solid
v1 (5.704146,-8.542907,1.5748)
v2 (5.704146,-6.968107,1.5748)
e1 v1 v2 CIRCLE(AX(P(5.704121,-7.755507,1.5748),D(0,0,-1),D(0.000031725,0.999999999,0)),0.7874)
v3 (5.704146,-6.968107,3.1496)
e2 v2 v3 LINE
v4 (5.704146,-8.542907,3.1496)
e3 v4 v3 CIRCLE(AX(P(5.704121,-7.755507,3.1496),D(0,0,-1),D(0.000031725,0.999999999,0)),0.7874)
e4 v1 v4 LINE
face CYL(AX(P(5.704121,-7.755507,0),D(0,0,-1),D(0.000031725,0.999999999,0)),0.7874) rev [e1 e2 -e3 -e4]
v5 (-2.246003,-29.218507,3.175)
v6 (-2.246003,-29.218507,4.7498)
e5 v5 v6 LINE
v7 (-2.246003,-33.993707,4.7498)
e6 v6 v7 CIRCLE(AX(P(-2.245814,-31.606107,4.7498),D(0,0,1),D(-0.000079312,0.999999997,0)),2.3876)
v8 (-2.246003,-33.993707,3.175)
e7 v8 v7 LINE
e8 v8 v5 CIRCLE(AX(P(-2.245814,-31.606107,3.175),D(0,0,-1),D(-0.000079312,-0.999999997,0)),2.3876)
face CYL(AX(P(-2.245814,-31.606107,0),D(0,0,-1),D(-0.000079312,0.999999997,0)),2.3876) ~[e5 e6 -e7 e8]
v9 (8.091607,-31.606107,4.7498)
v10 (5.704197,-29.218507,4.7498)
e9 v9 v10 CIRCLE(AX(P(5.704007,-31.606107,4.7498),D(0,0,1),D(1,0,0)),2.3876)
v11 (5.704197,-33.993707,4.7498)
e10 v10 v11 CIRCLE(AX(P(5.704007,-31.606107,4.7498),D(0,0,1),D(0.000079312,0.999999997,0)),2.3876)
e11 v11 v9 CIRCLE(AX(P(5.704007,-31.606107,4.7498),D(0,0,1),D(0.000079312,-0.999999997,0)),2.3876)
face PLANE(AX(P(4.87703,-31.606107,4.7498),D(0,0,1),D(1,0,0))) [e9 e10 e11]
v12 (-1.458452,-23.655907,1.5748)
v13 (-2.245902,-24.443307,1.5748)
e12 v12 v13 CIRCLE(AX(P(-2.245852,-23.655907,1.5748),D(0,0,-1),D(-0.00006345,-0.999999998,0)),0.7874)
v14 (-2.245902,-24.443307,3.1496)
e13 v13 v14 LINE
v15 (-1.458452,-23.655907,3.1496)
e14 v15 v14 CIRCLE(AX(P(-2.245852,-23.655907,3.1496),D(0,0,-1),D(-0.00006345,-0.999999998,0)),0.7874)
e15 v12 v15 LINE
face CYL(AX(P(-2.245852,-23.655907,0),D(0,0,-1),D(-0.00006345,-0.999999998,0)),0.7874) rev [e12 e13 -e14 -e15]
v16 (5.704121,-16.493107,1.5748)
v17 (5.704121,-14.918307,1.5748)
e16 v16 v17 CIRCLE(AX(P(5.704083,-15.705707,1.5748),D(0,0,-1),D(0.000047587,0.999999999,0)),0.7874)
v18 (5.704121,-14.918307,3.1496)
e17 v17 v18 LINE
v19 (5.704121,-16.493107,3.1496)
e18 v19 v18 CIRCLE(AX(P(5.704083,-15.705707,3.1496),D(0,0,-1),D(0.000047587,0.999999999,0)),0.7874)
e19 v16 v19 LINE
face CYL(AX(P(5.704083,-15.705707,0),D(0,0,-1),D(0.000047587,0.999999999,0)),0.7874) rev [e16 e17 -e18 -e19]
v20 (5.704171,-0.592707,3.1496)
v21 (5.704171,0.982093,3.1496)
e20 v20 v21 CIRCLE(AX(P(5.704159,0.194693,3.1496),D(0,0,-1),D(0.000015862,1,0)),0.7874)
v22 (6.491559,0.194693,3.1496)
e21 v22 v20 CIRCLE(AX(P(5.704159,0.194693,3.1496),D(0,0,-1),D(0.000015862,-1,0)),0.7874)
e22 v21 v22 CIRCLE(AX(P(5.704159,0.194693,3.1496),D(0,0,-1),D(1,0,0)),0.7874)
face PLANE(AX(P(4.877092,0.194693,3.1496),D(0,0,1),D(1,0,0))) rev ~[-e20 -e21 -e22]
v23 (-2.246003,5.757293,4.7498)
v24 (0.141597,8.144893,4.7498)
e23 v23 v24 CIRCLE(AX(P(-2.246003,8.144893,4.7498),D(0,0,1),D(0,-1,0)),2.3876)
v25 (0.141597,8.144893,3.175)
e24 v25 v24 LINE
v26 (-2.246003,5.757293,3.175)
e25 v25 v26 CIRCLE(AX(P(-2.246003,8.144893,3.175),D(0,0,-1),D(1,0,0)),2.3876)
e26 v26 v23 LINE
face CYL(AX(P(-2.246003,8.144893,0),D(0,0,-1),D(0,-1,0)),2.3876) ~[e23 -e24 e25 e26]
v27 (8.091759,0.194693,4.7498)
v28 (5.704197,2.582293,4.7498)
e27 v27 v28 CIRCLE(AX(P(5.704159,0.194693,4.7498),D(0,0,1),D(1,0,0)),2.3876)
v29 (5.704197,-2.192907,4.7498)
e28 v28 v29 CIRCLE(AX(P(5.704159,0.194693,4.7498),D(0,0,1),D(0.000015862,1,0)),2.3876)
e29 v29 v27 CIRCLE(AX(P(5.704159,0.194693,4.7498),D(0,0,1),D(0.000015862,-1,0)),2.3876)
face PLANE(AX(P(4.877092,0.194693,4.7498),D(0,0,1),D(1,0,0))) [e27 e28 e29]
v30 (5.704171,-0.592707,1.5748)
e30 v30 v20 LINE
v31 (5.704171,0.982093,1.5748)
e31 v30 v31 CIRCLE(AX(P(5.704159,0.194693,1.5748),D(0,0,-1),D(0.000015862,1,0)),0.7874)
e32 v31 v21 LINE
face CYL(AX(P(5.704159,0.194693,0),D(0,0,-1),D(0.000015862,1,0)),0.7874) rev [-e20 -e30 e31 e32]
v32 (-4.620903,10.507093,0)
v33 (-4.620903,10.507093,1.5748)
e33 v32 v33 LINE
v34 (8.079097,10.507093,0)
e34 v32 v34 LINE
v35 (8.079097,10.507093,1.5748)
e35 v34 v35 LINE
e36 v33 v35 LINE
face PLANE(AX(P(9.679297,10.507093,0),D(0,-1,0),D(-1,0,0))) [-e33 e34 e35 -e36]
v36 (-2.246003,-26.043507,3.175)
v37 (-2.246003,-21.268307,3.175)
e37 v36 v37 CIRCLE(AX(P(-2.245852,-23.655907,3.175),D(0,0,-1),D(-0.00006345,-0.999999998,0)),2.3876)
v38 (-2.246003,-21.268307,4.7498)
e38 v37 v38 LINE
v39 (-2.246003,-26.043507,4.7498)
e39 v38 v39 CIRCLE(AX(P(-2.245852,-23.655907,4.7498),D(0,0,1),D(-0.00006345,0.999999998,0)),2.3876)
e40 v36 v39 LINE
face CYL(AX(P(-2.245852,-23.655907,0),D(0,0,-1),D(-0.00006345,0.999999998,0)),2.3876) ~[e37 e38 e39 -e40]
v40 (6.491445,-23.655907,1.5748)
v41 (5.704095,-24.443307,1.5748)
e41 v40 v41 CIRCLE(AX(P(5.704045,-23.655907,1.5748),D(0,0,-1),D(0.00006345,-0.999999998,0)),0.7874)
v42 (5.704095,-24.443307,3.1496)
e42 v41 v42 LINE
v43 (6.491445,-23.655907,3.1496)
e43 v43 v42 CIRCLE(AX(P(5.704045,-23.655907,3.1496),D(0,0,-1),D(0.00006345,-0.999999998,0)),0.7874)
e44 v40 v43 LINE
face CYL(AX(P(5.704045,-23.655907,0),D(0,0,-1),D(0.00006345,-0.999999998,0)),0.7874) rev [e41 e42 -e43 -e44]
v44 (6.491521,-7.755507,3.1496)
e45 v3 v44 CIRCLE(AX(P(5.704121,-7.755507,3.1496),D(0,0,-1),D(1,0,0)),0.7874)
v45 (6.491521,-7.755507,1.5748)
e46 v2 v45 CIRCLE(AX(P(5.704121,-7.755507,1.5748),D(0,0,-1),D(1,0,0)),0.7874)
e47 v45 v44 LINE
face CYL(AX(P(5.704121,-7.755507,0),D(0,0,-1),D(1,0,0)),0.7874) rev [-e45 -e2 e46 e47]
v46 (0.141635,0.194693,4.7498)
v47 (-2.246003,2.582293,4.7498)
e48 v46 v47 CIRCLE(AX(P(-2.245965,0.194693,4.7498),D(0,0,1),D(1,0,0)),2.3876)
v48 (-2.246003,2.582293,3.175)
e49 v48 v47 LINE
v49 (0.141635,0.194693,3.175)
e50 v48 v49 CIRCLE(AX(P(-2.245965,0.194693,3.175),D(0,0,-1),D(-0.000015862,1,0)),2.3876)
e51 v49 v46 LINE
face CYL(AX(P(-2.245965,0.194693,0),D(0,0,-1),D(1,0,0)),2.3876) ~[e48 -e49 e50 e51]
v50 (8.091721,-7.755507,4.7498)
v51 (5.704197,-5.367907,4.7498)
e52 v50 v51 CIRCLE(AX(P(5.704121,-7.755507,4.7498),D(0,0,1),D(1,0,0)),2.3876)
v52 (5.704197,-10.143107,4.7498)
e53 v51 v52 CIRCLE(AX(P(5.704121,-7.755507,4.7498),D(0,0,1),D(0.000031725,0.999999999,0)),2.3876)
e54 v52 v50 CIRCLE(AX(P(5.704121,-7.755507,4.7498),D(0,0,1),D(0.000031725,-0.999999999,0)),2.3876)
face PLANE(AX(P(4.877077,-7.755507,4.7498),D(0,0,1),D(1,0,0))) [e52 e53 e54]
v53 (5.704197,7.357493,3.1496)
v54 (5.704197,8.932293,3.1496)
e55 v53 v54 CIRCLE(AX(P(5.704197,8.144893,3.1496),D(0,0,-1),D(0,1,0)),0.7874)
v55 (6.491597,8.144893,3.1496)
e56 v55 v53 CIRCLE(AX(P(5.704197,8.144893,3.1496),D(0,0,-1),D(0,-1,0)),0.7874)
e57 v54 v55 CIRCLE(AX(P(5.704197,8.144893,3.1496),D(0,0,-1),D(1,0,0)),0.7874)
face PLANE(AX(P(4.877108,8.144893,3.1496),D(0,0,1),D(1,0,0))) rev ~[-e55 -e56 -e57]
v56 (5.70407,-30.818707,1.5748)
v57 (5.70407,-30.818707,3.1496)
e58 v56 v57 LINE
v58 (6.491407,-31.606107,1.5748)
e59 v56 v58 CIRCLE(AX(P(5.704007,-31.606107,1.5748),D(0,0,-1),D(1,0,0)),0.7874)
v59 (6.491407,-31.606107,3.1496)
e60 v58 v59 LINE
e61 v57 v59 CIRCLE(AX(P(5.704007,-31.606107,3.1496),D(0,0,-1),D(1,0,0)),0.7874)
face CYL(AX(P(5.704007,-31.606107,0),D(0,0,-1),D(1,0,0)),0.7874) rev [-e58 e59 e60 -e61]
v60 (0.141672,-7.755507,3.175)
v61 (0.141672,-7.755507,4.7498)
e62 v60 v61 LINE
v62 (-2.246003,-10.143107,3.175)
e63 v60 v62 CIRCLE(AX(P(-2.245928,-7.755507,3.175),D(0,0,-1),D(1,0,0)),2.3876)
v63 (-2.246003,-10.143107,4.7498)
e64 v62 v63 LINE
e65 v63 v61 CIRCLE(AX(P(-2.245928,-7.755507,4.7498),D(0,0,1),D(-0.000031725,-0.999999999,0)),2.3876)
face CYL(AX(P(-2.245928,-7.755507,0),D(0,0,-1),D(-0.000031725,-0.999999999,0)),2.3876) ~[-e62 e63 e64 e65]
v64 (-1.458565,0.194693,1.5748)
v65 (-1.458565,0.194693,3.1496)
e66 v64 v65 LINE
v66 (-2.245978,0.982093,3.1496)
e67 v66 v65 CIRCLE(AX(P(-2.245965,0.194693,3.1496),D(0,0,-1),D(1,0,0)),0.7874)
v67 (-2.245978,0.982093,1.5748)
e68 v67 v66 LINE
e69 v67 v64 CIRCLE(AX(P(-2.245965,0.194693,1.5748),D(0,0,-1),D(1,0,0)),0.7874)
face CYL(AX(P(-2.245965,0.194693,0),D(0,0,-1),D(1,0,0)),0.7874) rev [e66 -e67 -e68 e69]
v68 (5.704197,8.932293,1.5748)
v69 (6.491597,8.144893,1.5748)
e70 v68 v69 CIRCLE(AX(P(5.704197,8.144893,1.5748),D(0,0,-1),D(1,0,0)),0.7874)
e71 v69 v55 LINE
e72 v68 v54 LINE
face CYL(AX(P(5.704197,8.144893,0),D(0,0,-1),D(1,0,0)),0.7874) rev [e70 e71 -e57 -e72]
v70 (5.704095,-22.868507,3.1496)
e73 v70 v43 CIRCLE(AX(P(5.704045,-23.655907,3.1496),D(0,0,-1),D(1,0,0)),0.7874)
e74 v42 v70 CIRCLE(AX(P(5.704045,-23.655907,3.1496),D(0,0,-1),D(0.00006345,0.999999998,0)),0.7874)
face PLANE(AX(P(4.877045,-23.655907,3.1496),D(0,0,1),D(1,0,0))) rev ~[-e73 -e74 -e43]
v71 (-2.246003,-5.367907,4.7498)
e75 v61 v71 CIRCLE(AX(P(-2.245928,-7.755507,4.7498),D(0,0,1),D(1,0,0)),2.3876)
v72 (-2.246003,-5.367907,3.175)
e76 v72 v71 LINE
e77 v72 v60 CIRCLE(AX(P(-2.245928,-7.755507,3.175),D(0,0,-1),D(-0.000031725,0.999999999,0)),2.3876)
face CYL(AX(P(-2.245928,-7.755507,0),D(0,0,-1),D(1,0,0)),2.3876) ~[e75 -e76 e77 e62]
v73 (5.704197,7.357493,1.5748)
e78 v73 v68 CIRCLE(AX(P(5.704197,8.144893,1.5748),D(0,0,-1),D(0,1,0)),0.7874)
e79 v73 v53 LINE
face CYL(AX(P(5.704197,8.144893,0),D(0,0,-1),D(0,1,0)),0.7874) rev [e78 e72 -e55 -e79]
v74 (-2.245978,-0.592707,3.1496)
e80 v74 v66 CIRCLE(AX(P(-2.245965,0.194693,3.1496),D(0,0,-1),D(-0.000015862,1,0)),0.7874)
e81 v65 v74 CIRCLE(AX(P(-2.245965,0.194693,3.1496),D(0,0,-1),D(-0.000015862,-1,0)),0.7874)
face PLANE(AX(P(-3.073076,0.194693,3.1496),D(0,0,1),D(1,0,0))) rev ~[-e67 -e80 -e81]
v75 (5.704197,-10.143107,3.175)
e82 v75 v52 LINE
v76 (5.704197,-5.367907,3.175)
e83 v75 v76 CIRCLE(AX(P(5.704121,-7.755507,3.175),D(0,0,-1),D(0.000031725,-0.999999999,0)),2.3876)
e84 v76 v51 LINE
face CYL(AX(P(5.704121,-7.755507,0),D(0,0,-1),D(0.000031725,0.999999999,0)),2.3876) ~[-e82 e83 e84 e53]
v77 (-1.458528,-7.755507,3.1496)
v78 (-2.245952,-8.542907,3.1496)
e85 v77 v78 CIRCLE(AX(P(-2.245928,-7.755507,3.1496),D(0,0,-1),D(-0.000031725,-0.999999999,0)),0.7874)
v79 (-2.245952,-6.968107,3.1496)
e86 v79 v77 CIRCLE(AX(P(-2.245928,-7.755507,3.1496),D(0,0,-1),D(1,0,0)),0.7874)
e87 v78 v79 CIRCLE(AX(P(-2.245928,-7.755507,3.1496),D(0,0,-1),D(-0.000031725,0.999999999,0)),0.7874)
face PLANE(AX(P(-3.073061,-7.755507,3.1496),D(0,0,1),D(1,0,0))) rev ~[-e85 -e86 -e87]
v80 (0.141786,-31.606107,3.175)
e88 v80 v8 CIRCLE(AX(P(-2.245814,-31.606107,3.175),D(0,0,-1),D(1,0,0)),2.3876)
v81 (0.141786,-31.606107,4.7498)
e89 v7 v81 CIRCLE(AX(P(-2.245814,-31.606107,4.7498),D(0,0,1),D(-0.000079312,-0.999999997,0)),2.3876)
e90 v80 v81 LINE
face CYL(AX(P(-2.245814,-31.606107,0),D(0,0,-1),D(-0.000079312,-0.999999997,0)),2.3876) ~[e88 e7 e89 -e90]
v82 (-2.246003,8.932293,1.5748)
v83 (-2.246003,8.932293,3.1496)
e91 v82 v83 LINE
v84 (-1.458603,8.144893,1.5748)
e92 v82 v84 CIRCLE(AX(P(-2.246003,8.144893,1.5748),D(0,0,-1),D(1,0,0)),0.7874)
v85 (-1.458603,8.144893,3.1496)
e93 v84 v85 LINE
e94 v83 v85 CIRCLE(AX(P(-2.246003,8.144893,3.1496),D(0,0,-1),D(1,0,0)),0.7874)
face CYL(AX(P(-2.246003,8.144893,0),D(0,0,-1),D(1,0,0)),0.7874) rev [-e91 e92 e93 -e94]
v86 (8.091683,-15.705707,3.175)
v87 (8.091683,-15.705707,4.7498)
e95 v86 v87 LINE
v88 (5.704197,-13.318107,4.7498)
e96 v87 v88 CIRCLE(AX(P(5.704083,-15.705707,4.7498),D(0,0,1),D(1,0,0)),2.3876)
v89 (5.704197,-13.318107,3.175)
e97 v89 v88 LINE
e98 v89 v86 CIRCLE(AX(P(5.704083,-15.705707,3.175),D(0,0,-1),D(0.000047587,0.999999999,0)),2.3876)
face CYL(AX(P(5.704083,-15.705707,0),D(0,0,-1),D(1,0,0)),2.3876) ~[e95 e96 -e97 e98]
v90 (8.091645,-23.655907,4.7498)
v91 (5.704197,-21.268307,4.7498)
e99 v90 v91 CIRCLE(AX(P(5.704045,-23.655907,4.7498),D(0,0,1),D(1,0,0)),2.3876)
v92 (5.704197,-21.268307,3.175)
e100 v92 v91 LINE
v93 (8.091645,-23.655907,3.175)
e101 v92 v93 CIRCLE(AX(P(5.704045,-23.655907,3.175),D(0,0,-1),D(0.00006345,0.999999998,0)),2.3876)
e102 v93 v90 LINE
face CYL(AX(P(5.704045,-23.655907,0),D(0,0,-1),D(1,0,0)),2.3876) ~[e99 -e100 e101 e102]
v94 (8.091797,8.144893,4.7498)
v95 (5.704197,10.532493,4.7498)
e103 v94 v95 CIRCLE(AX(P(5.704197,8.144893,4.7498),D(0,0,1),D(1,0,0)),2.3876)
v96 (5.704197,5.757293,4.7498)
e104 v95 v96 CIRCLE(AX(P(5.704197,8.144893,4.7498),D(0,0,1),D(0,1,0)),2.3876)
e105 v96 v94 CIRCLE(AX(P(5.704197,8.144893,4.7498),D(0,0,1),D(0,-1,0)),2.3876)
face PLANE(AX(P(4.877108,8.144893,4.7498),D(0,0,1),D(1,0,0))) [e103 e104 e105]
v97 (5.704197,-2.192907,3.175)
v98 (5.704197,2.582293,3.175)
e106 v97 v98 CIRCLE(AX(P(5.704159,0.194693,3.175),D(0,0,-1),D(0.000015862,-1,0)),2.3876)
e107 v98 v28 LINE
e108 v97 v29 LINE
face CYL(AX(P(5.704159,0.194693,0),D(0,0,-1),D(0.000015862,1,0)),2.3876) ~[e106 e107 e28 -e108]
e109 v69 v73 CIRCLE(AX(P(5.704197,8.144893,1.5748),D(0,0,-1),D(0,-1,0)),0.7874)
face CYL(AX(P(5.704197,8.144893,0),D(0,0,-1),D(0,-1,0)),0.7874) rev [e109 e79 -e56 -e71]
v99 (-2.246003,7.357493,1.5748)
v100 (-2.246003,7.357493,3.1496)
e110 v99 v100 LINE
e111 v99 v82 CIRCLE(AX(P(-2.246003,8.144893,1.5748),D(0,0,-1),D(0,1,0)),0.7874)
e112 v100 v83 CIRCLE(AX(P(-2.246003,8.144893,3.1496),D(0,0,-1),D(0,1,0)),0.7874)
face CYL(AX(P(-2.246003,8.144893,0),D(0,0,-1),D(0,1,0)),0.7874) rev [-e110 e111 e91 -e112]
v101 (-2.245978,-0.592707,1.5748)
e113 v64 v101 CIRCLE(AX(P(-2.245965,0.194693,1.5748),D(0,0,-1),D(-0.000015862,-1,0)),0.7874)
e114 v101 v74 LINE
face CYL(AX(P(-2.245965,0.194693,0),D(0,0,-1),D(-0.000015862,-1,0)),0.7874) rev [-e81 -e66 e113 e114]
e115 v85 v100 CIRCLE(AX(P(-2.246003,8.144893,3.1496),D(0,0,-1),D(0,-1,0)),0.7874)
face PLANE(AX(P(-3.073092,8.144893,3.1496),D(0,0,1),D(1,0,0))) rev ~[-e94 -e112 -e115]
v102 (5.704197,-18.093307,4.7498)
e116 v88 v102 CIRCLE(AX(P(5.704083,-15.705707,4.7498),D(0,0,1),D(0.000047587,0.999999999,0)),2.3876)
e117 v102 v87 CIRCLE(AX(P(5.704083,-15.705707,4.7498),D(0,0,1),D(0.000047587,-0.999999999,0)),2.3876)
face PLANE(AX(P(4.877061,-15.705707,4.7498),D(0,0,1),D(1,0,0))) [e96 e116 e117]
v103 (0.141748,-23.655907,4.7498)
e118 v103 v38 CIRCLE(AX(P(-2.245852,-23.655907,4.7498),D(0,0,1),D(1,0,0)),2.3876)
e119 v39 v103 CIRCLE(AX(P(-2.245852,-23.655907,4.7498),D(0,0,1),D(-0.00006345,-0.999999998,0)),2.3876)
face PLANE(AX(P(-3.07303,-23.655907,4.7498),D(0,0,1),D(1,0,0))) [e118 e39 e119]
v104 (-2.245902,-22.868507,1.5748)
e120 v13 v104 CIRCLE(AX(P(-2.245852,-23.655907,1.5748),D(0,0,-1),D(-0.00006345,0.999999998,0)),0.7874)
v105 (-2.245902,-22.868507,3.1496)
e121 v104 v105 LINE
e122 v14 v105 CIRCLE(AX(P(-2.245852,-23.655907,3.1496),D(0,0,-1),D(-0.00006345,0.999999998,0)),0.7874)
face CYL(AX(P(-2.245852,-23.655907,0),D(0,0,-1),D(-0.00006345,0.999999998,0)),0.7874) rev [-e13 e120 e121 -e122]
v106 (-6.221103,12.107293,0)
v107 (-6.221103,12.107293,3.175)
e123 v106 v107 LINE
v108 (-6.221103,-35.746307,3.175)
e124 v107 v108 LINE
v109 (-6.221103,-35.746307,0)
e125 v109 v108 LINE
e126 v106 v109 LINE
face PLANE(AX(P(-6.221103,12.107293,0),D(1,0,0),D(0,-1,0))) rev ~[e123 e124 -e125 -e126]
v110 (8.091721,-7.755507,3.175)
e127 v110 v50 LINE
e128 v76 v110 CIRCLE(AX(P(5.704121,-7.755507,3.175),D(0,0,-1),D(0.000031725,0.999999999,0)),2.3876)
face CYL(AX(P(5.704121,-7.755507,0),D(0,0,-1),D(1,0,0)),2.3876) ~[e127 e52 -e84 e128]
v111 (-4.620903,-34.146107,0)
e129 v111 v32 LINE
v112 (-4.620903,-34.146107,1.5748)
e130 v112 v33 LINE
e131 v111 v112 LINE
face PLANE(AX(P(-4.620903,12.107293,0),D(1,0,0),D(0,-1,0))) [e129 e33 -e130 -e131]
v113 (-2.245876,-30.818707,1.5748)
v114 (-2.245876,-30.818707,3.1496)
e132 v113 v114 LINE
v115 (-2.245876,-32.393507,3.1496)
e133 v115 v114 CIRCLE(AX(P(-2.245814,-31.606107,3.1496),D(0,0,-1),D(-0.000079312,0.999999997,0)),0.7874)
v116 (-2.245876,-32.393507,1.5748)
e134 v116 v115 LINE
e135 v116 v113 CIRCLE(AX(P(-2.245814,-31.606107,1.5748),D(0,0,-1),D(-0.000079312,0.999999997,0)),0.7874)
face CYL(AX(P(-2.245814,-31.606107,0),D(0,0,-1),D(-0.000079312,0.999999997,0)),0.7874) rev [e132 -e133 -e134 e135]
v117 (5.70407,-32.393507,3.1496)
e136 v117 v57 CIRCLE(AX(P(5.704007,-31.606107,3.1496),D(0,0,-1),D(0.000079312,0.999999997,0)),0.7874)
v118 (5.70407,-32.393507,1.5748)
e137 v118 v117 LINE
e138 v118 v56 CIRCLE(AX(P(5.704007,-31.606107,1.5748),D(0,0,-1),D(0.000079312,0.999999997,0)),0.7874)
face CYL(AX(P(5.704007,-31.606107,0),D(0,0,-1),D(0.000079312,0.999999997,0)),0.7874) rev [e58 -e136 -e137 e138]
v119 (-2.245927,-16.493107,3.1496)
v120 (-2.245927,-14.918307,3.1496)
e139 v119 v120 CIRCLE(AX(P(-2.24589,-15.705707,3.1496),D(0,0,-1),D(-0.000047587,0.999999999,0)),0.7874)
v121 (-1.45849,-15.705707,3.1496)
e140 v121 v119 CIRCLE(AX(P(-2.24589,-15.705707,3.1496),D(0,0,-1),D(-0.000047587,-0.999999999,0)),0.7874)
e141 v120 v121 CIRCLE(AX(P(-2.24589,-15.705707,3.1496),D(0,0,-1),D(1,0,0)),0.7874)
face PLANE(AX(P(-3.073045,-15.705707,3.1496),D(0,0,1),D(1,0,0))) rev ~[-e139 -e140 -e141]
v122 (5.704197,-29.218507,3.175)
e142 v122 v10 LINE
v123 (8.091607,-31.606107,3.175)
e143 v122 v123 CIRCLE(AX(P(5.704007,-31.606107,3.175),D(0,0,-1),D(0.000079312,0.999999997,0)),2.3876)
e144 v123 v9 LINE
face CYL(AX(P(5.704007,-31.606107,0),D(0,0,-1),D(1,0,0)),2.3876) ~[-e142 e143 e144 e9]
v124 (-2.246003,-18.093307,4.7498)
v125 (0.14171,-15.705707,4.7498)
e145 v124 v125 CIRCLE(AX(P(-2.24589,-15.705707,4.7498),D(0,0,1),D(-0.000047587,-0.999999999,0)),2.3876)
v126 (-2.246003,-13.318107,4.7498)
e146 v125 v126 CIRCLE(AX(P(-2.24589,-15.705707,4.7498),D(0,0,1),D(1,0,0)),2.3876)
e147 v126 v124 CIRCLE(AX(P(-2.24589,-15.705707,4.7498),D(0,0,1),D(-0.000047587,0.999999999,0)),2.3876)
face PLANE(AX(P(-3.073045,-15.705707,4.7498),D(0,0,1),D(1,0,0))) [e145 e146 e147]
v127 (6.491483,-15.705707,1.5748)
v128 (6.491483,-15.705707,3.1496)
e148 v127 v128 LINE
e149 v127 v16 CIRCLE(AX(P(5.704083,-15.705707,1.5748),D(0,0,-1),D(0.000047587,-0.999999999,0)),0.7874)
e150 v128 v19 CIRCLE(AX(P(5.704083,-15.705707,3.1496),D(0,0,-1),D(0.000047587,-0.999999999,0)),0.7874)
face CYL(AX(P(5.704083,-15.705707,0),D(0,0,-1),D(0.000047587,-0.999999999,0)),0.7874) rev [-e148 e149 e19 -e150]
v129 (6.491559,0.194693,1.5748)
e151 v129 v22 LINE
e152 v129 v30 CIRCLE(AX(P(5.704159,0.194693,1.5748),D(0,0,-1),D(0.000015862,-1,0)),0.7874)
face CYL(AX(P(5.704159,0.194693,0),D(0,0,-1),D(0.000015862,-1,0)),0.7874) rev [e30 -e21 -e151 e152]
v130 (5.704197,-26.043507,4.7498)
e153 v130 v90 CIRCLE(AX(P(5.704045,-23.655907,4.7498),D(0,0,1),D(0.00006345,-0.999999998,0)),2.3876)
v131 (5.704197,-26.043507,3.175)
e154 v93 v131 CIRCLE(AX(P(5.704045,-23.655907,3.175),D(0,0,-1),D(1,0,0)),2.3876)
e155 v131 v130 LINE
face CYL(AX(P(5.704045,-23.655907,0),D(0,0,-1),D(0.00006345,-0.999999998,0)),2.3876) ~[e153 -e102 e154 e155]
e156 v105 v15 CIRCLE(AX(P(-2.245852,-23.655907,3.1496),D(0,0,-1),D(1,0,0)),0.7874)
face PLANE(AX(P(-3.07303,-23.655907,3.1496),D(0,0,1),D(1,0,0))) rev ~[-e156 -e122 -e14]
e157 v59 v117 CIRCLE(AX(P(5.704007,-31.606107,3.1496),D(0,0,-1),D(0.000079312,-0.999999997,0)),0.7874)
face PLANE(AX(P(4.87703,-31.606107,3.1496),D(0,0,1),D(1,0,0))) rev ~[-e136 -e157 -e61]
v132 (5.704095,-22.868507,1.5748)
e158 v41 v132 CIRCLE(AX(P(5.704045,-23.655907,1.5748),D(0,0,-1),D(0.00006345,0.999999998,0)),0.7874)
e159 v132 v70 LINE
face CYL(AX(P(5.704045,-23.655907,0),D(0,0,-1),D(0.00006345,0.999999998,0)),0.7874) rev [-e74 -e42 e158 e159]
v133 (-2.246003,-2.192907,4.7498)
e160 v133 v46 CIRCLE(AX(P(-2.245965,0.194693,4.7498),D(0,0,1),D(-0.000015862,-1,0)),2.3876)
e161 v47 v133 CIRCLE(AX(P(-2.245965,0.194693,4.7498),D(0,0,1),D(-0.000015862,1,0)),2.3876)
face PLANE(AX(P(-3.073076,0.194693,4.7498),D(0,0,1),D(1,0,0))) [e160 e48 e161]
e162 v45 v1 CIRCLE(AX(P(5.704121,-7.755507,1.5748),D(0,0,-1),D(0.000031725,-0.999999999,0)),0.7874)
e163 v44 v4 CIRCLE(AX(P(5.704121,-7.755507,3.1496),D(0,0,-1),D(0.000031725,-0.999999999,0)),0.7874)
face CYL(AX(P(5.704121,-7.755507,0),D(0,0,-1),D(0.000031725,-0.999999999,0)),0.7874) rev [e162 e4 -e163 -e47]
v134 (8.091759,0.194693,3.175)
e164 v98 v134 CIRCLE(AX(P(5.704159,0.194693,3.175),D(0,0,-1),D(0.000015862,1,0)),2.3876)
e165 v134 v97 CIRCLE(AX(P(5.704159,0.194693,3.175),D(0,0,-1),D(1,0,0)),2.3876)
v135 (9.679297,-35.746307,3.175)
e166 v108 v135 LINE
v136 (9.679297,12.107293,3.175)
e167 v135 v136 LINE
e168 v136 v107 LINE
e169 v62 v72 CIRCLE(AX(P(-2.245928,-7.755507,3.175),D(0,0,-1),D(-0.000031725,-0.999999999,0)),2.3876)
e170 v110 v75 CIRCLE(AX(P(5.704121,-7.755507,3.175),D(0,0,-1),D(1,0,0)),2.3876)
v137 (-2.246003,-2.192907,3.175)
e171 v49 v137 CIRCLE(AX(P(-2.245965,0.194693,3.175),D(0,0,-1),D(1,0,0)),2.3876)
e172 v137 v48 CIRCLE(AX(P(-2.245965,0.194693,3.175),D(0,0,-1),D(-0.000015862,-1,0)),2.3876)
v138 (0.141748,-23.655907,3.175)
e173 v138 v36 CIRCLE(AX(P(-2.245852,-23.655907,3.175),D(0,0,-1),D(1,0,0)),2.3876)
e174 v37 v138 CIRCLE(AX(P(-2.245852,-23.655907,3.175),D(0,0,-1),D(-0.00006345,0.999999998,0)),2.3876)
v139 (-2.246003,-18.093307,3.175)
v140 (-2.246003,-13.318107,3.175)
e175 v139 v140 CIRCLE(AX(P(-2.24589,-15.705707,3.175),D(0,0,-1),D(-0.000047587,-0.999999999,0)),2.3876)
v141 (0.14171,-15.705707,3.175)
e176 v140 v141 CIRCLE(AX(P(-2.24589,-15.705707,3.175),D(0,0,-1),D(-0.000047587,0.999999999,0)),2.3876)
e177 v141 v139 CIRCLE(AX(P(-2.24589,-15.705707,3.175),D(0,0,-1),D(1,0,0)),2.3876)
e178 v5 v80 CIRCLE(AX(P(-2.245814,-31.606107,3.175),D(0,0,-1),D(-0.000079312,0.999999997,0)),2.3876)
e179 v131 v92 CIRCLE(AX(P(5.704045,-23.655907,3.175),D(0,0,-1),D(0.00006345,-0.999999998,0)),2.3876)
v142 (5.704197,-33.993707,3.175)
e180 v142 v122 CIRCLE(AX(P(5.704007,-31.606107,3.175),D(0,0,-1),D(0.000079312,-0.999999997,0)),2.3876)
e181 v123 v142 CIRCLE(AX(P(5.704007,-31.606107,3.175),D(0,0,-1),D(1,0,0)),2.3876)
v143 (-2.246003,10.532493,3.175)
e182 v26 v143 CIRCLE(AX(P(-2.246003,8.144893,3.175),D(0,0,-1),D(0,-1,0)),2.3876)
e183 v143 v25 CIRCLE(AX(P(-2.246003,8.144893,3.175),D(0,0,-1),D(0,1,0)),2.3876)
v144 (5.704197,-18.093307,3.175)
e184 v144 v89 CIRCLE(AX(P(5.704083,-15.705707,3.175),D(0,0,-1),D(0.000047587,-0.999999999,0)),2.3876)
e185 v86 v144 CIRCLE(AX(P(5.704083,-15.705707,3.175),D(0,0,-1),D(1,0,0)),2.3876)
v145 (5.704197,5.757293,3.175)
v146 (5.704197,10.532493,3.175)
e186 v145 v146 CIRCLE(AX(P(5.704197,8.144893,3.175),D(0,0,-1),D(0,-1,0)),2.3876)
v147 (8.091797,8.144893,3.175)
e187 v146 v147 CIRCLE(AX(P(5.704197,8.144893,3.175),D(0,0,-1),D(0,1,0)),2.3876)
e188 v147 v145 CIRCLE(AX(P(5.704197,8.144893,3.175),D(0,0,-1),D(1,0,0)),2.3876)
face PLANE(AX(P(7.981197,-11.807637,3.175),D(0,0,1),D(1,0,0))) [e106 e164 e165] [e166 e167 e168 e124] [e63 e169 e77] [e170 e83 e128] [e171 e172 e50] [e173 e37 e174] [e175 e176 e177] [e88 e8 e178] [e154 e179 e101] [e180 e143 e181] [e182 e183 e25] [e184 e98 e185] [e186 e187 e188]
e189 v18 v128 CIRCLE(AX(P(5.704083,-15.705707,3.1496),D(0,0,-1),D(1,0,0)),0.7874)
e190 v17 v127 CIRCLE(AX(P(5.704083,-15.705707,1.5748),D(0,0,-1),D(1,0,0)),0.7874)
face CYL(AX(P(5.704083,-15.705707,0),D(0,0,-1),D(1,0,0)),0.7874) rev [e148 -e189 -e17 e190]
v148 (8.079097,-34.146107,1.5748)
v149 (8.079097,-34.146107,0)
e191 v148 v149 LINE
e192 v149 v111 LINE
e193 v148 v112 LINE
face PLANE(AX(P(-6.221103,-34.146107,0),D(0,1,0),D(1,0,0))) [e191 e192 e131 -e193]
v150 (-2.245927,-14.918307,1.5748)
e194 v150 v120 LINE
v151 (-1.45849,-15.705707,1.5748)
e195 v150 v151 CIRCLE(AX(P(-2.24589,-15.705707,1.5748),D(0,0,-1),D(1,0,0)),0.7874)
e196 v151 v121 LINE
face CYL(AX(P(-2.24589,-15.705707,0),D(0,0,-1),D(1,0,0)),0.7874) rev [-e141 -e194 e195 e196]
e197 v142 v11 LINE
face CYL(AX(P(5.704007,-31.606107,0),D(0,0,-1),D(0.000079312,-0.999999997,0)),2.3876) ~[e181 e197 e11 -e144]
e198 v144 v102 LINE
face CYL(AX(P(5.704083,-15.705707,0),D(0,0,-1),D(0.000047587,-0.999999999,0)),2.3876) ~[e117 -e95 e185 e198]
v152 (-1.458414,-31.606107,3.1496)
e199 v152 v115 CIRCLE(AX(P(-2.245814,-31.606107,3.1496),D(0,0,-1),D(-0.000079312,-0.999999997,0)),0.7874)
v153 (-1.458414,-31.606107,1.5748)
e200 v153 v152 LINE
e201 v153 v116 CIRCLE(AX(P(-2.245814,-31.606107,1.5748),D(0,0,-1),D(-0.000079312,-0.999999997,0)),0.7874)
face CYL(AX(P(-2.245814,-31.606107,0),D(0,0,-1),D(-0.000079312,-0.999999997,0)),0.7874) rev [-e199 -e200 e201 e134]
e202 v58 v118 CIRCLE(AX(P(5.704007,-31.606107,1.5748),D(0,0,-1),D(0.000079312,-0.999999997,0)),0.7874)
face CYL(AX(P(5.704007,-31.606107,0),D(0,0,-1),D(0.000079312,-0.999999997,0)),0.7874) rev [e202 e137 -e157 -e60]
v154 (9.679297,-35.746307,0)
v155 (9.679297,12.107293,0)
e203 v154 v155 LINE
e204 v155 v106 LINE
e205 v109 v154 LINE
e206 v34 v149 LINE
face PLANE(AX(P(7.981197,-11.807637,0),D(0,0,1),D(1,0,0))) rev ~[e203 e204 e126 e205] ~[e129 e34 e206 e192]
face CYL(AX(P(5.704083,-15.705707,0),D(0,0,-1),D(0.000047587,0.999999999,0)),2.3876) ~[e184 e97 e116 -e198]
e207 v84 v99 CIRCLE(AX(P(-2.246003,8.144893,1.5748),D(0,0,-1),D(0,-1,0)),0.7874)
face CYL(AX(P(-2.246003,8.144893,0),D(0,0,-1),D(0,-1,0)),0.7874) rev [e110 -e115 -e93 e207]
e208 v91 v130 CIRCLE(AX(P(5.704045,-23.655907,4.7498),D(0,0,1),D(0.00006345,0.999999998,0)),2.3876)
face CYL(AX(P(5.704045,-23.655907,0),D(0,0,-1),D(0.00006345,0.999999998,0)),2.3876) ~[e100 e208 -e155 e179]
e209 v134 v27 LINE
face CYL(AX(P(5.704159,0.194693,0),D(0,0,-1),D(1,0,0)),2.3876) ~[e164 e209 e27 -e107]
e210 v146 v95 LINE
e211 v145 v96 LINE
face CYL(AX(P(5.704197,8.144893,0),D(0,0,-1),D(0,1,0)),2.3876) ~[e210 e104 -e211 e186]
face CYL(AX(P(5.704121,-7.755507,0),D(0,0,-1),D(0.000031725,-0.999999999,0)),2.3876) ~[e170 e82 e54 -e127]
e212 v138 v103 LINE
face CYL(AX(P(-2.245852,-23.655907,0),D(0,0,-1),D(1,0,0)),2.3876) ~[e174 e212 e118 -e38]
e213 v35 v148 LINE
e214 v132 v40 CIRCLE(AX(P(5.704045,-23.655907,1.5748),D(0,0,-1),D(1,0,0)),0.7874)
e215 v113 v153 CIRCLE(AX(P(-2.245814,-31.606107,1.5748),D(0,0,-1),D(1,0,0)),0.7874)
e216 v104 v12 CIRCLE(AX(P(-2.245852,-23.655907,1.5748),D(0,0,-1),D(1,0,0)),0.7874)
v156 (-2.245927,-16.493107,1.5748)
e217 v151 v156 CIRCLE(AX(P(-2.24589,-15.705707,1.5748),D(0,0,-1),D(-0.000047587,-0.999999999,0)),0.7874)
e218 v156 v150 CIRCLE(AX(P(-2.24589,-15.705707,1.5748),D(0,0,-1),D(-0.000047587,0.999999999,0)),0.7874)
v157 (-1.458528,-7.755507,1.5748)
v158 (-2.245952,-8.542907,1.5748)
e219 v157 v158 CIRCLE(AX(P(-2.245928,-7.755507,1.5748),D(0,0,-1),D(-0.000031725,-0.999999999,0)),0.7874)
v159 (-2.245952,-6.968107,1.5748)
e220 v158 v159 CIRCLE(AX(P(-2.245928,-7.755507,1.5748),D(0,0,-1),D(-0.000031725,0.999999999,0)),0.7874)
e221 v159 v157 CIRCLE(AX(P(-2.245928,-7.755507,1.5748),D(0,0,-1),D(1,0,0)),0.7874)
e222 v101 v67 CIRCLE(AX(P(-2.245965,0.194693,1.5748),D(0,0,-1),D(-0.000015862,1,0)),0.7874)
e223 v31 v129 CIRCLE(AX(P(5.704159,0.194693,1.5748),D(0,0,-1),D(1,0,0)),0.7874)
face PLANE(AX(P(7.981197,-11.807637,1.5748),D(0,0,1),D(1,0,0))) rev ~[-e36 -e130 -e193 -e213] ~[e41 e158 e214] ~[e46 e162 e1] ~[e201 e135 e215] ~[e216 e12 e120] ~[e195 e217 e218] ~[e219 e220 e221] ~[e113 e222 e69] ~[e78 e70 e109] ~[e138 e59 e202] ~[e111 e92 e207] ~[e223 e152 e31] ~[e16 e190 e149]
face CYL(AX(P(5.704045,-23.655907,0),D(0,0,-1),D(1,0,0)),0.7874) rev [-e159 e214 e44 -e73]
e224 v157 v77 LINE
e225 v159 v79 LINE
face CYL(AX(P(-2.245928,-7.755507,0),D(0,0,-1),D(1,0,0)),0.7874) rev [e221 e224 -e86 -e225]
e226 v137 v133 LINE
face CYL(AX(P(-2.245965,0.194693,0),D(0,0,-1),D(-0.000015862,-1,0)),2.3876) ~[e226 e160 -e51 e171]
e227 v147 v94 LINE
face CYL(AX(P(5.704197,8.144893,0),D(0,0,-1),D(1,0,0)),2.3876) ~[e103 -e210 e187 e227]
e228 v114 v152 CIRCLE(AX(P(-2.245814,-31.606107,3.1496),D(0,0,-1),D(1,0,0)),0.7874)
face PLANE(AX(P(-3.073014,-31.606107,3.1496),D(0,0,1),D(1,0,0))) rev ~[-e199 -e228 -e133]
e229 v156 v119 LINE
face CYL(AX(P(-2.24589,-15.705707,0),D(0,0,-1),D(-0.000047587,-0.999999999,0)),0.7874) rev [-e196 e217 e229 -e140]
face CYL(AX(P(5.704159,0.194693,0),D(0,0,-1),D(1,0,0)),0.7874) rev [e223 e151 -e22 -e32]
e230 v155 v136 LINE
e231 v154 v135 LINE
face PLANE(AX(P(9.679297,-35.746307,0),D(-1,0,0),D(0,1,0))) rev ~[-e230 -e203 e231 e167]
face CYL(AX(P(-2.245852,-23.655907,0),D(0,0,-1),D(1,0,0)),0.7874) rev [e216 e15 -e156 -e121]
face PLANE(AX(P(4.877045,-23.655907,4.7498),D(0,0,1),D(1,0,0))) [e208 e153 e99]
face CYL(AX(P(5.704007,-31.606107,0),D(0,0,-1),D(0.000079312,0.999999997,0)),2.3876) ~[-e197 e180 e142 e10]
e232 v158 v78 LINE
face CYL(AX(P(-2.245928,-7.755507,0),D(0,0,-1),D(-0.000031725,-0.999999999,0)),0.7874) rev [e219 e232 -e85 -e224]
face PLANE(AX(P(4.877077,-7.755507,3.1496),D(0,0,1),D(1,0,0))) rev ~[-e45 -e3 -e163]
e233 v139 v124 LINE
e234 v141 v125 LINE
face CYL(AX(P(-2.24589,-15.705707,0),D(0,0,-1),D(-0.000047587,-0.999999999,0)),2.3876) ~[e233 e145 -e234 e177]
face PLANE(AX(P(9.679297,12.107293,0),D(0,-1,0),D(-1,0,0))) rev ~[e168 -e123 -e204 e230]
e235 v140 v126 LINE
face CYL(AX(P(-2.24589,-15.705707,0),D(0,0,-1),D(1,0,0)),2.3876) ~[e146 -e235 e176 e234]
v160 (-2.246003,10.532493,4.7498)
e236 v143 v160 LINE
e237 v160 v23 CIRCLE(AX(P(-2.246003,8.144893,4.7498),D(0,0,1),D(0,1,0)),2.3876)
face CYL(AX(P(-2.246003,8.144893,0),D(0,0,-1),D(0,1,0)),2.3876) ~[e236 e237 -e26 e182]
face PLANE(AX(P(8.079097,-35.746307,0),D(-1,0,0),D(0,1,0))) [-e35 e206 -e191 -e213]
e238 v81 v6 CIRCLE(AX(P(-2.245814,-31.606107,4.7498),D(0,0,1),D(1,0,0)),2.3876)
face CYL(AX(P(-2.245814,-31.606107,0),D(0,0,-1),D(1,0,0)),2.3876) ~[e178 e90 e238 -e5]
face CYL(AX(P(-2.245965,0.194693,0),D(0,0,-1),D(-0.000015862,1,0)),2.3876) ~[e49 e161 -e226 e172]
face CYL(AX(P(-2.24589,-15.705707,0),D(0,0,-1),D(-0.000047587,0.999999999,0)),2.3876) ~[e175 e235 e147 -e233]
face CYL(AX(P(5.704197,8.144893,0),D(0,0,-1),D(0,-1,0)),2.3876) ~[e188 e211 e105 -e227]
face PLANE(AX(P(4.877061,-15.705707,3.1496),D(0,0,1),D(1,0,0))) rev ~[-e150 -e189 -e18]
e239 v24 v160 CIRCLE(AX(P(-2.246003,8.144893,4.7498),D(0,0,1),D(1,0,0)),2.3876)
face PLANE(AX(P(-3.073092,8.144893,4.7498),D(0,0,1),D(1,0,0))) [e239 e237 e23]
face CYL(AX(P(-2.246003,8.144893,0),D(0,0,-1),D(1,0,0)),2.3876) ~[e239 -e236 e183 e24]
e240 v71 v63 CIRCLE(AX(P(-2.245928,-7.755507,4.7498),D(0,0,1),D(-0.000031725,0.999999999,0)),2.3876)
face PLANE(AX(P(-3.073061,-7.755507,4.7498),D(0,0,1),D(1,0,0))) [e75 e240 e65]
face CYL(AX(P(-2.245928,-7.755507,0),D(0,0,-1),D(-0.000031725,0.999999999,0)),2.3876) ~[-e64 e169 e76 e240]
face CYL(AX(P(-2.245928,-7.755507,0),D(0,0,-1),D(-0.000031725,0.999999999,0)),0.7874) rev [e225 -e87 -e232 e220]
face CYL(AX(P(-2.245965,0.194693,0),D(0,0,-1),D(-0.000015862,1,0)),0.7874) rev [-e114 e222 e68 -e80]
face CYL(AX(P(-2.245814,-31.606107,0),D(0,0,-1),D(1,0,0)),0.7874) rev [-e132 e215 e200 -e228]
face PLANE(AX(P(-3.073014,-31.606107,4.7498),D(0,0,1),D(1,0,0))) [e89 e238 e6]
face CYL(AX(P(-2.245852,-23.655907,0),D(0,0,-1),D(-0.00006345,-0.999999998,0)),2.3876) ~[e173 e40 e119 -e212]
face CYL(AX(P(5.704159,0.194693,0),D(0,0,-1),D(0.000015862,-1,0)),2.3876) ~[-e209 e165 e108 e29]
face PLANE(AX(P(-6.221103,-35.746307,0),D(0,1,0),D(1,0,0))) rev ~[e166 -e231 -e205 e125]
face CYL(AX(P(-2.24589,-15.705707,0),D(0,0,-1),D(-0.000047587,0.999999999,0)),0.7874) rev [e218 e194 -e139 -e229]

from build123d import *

# Parameters (mm, degrees)
F1_DEPTH = 3.175
F2_DEPTH = 4.7498
F3_T     = -1.6002


with BuildPart() as f1:
    # F0 (on Top) → F1 (new body)
    with BuildSketch(Plane.XY):
        with BuildLine():
            Line((5.7041967517, -35.7463070254), (9.6792967517, -35.7463070254))
            Line((9.6792967517, -35.7463070254), (9.6792967517, 12.1072929746))
            Line((9.6792967517, 12.1072929746), (5.7041967517, 12.1072929746))
            Line((5.7041967517, 12.1072929746), (5.7041967517, 10.5324929746))
            ThreePointArc((5.7041967517, 10.5324929746), (7.3924849024, 9.8331811253), (8.0917967517, 8.1448929746))
            ThreePointArc((8.0917967517, 8.1448929746), (7.3924849024, 6.4566048238), (5.7041967517, 5.7572929746))
            Line((5.7041967517, 5.7572929746), (5.7041967517, 2.5822929744))
            ThreePointArc((5.7041967517, 2.5822929744), (7.3924604194, 1.8829677352), (8.0917588785, 0.1946929747))
            ThreePointArc((8.0917588785, 0.1946929747), (7.3924604194, -1.4935817859), (5.7041967517, -2.192907025))
            Line((5.7041967517, -2.192907025), (5.7041967517, -5.3679070265))
            ThreePointArc((5.7041967517, -5.3679070265), (7.3924359362, -6.0672456551), (8.0917210053, -7.7555070253))
            ThreePointArc((8.0917210053, -7.7555070253), (7.3924359362, -9.4437683954), (5.7041967517, -10.143107024))
            Line((5.7041967517, -10.143107024), (5.7041967517, -13.3181070279))
            ThreePointArc((5.7041967517, -13.3181070279), (7.392411453, -14.0174590455), (8.0916831321, -15.7057070252))
            ThreePointArc((8.0916831321, -15.7057070252), (7.392411453, -17.3939550049), (5.7041967517, -18.0933070225))
            Line((5.7041967517, -18.0933070225), (5.7041967517, -21.2683070299))
            ThreePointArc((5.7041967517, -21.2683070299), (7.3923869696, -21.9676724359), (8.0916452589, -23.6559070251))
            ThreePointArc((8.0916452589, -23.6559070251), (7.3923869696, -25.3441416142), (5.7041967517, -26.0435070203))
            Line((5.7041967517, -26.0435070203), (5.7041967517, -29.2185070325))
            ThreePointArc((5.7041967517, -29.2185070325), (7.3923624861, -29.9178858265), (8.0916073858, -31.606107025))
            ThreePointArc((8.0916073858, -31.606107025), (7.3923624861, -33.2943282235), (5.7041967517, -33.9937070175))
            Line((5.7041967517, -33.9937070175), (5.7041967517, -35.7463070254))
        make_face()
        with BuildLine():
            Line((1.7290967517, -35.7463070254), (5.7041967517, -35.7463070254))
            Line((5.7041967517, -35.7463070254), (5.7041967517, -33.9937070175))
            ThreePointArc((5.7041967517, -33.9937070175), (3.3164073858, -31.606107025), (5.7041967517, -29.2185070325))
            Line((5.7041967517, -29.2185070325), (5.7041967517, -26.0435070203))
            ThreePointArc((5.7041967517, -26.0435070203), (3.3164452589, -23.6559070251), (5.7041967517, -21.2683070299))
            Line((5.7041967517, -21.2683070299), (5.7041967517, -18.0933070225))
            ThreePointArc((5.7041967517, -18.0933070225), (3.3164831321, -15.7057070252), (5.7041967517, -13.3181070279))
            Line((5.7041967517, -13.3181070279), (5.7041967517, -10.143107024))
            ThreePointArc((5.7041967517, -10.143107024), (3.3165210053, -7.7555070253), (5.7041967517, -5.3679070265))
            Line((5.7041967517, -5.3679070265), (5.7041967517, -2.192907025))
            ThreePointArc((5.7041967517, -2.192907025), (3.3165588785, 0.1946929747), (5.7041967517, 2.5822929744))
            Line((5.7041967517, 2.5822929744), (5.7041967517, 5.7572929746))
            ThreePointArc((5.7041967517, 5.7572929746), (3.3165967517, 8.1448929746), (5.7041967517, 10.5324929746))
            Line((5.7041967517, 10.5324929746), (5.7041967517, 12.1072929746))
            Line((5.7041967517, 12.1072929746), (1.7290967517, 12.1072929746))
            Line((1.7290967517, 12.1072929746), (-2.2460032483, 12.1072929746))
            Line((-2.2460032483, 12.1072929746), (-2.2460032483, 10.5324929746))
            ThreePointArc((-2.2460032483, 10.5324929746), (-0.5577150976, 9.8331811253), (0.1415967517, 8.1448929746))
            ThreePointArc((0.1415967517, 8.1448929746), (-0.5577150976, 6.4566048238), (-2.2460032483, 5.7572929746))
            Line((-2.2460032483, 5.7572929746), (-2.2460032483, 2.5822929744))
            ThreePointArc((-2.2460032483, 2.5822929744), (-0.5576906146, 1.8829945156), (0.1416346248, 0.1946929747))
            ThreePointArc((0.1416346248, 0.1946929747), (-0.5576906146, -1.4936085662), (-2.2460032483, -2.192907025))
            Line((-2.2460032483, -2.192907025), (-2.2460032483, -5.3679070265))
            ThreePointArc((-2.2460032483, -5.3679070265), (-0.5576661318, -6.0671920943), (0.141672498, -7.7555070253))
            ThreePointArc((0.141672498, -7.7555070253), (-0.5576661318, -9.4438219562), (-2.2460032483, -10.143107024))
            Line((-2.2460032483, -10.143107024), (-2.2460032483, -13.3181070279))
            ThreePointArc((-2.2460032483, -13.3181070279), (-0.5576416491, -14.0173787043), (0.1417103712, -15.7057070252))
            ThreePointArc((0.1417103712, -15.7057070252), (-0.5576416491, -17.394035346), (-2.2460032483, -18.0933070225))
            Line((-2.2460032483, -18.0933070225), (-2.2460032483, -21.2683070299))
            ThreePointArc((-2.2460032483, -21.2683070299), (-0.5576171665, -21.9675653144), (0.1417482444, -23.6559070251))
            ThreePointArc((0.1417482444, -23.6559070251), (-0.5576171665, -25.3442487357), (-2.2460032483, -26.0435070203))
            Line((-2.2460032483, -26.0435070203), (-2.2460032483, -29.2185070325))
            ThreePointArc((-2.2460032483, -29.2185070325), (-0.557592684, -29.9177519246), (0.1417861176, -31.606107025))
            ThreePointArc((0.1417861176, -31.606107025), (-0.557592684, -33.2944621254), (-2.2460032483, -33.9937070175))
            Line((-2.2460032483, -33.9937070175), (-2.2460032483, -35.7463070254))
            Line((-2.2460032483, -35.7463070254), (1.7290967517, -35.7463070254))
        make_face()
        with BuildLine():
            Line((-6.2211032483, -35.7463070254), (-2.2460032483, -35.7463070254))
            Line((-2.2460032483, -35.7463070254), (-2.2460032483, -33.9937070175))
            ThreePointArc((-2.2460032483, -33.9937070175), (-4.6334138824, -31.606107025), (-2.2460032483, -29.2185070325))
            Line((-2.2460032483, -29.2185070325), (-2.2460032483, -26.0435070203))
            ThreePointArc((-2.2460032483, -26.0435070203), (-4.6334517556, -23.6559070251), (-2.2460032483, -21.2683070299))
            Line((-2.2460032483, -21.2683070299), (-2.2460032483, -18.0933070225))
            ThreePointArc((-2.2460032483, -18.0933070225), (-4.6334896288, -15.7057070252), (-2.2460032483, -13.3181070279))
            Line((-2.2460032483, -13.3181070279), (-2.2460032483, -10.143107024))
            ThreePointArc((-2.2460032483, -10.143107024), (-4.633527502, -7.7555070253), (-2.2460032483, -5.3679070265))
            Line((-2.2460032483, -5.3679070265), (-2.2460032483, -2.192907025))
            ThreePointArc((-2.2460032483, -2.192907025), (-4.6335653752, 0.1946929747), (-2.2460032483, 2.5822929744))
            Line((-2.2460032483, 2.5822929744), (-2.2460032483, 5.7572929746))
            ThreePointArc((-2.2460032483, 5.7572929746), (-4.6336032483, 8.1448929746), (-2.2460032483, 10.5324929746))
            Line((-2.2460032483, 10.5324929746), (-2.2460032483, 12.1072929746))
            Line((-2.2460032483, 12.1072929746), (-6.2211032483, 12.1072929746))
            Line((-6.2211032483, 12.1072929746), (-6.2211032483, -35.7463070254))
        make_face()
    extrude(amount=F1_DEPTH)

    # F0 (on Top) → F2 (join)
    with BuildSketch(Plane.XY):
        with BuildLine():
            ThreePointArc((-2.2460032483, -29.2185070325), (-4.6334138824, -31.606107025), (-2.2460032483, -33.9937070175))
            Line((-2.2460032483, -33.9937070175), (-2.2460032483, -29.2185070325))
        make_face()
        with BuildLine():
            Line((-2.2460032483, -29.2185070325), (-2.2460032483, -33.9937070175))
            ThreePointArc((-2.2460032483, -33.9937070175), (-0.557592684, -33.2944621254), (0.1417861176, -31.606107025))
            ThreePointArc((0.1417861176, -31.606107025), (-0.557592684, -29.9177519246), (-2.2460032483, -29.2185070325))
        make_face()
        with BuildLine():
            ThreePointArc((-2.2460032483, -21.2683070299), (-4.6334517556, -23.6559070251), (-2.2460032483, -26.0435070203))
            Line((-2.2460032483, -26.0435070203), (-2.2460032483, -21.2683070299))
        make_face()
        with BuildLine():
            Line((-2.2460032483, -21.2683070299), (-2.2460032483, -26.0435070203))
            ThreePointArc((-2.2460032483, -26.0435070203), (-0.5576171665, -25.3442487357), (0.1417482444, -23.6559070251))
            ThreePointArc((0.1417482444, -23.6559070251), (-0.5576171665, -21.9675653144), (-2.2460032483, -21.2683070299))
        make_face()
        with BuildLine():
            ThreePointArc((-2.2460032483, -13.3181070279), (-4.6334896288, -15.7057070252), (-2.2460032483, -18.0933070225))
            Line((-2.2460032483, -18.0933070225), (-2.2460032483, -13.3181070279))
        make_face()
        with BuildLine():
            Line((-2.2460032483, -13.3181070279), (-2.2460032483, -18.0933070225))
            ThreePointArc((-2.2460032483, -18.0933070225), (-0.5576416491, -17.394035346), (0.1417103712, -15.7057070252))
            ThreePointArc((0.1417103712, -15.7057070252), (-0.5576416491, -14.0173787043), (-2.2460032483, -13.3181070279))
        make_face()
        with BuildLine():
            Line((-2.2460032483, -10.143107024), (-2.2460032483, -5.3679070265))
            ThreePointArc((-2.2460032483, -5.3679070265), (-4.633527502, -7.7555070253), (-2.2460032483, -10.143107024))
        make_face()
        with BuildLine():
            ThreePointArc((0.141672498, -7.7555070253), (-0.5576661318, -6.0671920943), (-2.2460032483, -5.3679070265))
            Line((-2.2460032483, -5.3679070265), (-2.2460032483, -10.143107024))
            ThreePointArc((-2.2460032483, -10.143107024), (-0.5576661318, -9.4438219562), (0.141672498, -7.7555070253))
        make_face()
        with BuildLine():
            Line((-2.2460032483, -2.192907025), (-2.2460032483, 2.5822929744))
            ThreePointArc((-2.2460032483, 2.5822929744), (-4.6335653752, 0.1946929747), (-2.2460032483, -2.192907025))
        make_face()
        with BuildLine():
            ThreePointArc((0.1416346248, 0.1946929747), (-0.5576906146, 1.8829945156), (-2.2460032483, 2.5822929744))
            Line((-2.2460032483, 2.5822929744), (-2.2460032483, -2.192907025))
            ThreePointArc((-2.2460032483, -2.192907025), (-0.5576906146, -1.4936085662), (0.1416346248, 0.1946929747))
        make_face()
        with BuildLine():
            Line((-2.2460032483, 5.7572929746), (-2.2460032483, 10.5324929746))
            ThreePointArc((-2.2460032483, 10.5324929746), (-4.6336032483, 8.1448929746), (-2.2460032483, 5.7572929746))
        make_face()
        with BuildLine():
            ThreePointArc((0.1415967517, 8.1448929746), (-0.5577150976, 9.8331811253), (-2.2460032483, 10.5324929746))
            Line((-2.2460032483, 10.5324929746), (-2.2460032483, 5.7572929746))
            ThreePointArc((-2.2460032483, 5.7572929746), (-0.5577150976, 6.4566048238), (0.1415967517, 8.1448929746))
        make_face()
        with BuildLine():
            ThreePointArc((5.7041967517, -29.2185070325), (3.3164073858, -31.606107025), (5.7041967517, -33.9937070175))
            Line((5.7041967517, -33.9937070175), (5.7041967517, -29.2185070325))
        make_face()
        with BuildLine():
            Line((5.7041967517, -29.2185070325), (5.7041967517, -33.9937070175))
            ThreePointArc((5.7041967517, -33.9937070175), (7.3923624861, -33.2943282235), (8.0916073858, -31.606107025))
            ThreePointArc((8.0916073858, -31.606107025), (7.3923624861, -29.9178858265), (5.7041967517, -29.2185070325))
        make_face()
        with BuildLine():
            ThreePointArc((5.7041967517, -21.2683070299), (3.3164452589, -23.6559070251), (5.7041967517, -26.0435070203))
            Line((5.7041967517, -26.0435070203), (5.7041967517, -21.2683070299))
        make_face()
        with BuildLine():
            Line((5.7041967517, -21.2683070299), (5.7041967517, -26.0435070203))
            ThreePointArc((5.7041967517, -26.0435070203), (7.3923869696, -25.3441416142), (8.0916452589, -23.6559070251))
            ThreePointArc((8.0916452589, -23.6559070251), (7.3923869696, -21.9676724359), (5.7041967517, -21.2683070299))
        make_face()
        with BuildLine():
            ThreePointArc((5.7041967517, -13.3181070279), (3.3164831321, -15.7057070252), (5.7041967517, -18.0933070225))
            Line((5.7041967517, -18.0933070225), (5.7041967517, -13.3181070279))
        make_face()
        with BuildLine():
            Line((5.7041967517, -10.143107024), (5.7041967517, -5.3679070265))
            ThreePointArc((5.7041967517, -5.3679070265), (3.3165210053, -7.7555070253), (5.7041967517, -10.143107024))
        make_face()
        with BuildLine():
            ThreePointArc((8.0917210053, -7.7555070253), (7.3924359362, -6.0672456551), (5.7041967517, -5.3679070265))
            Line((5.7041967517, -5.3679070265), (5.7041967517, -10.143107024))
            ThreePointArc((5.7041967517, -10.143107024), (7.3924359362, -9.4437683954), (8.0917210053, -7.7555070253))
        make_face()
        with BuildLine():
            Line((5.7041967517, -13.3181070279), (5.7041967517, -18.0933070225))
            ThreePointArc((5.7041967517, -18.0933070225), (7.392411453, -17.3939550049), (8.0916831321, -15.7057070252))
            ThreePointArc((8.0916831321, -15.7057070252), (7.392411453, -14.0174590455), (5.7041967517, -13.3181070279))
        make_face()
        with BuildLine():
            Line((5.7041967517, -2.192907025), (5.7041967517, 2.5822929744))
            ThreePointArc((5.7041967517, 2.5822929744), (3.3165588785, 0.1946929747), (5.7041967517, -2.192907025))
        make_face()
        with BuildLine():
            ThreePointArc((8.0917588785, 0.1946929747), (7.3924604194, 1.8829677352), (5.7041967517, 2.5822929744))
            Line((5.7041967517, 2.5822929744), (5.7041967517, -2.192907025))
            ThreePointArc((5.7041967517, -2.192907025), (7.3924604194, -1.4935817859), (8.0917588785, 0.1946929747))
        make_face()
        with BuildLine():
            Line((5.7041967517, 5.7572929746), (5.7041967517, 10.5324929746))
            ThreePointArc((5.7041967517, 10.5324929746), (3.3165967517, 8.1448929746), (5.7041967517, 5.7572929746))
        make_face()
        with BuildLine():
            ThreePointArc((8.0917967517, 8.1448929746), (7.3924849024, 9.8331811253), (5.7041967517, 10.5324929746))
            Line((5.7041967517, 10.5324929746), (5.7041967517, 5.7572929746))
            ThreePointArc((5.7041967517, 5.7572929746), (7.3924849024, 6.4566048238), (8.0917967517, 8.1448929746))
        make_face()
    extrude(amount=F2_DEPTH)

    # F3
    f3_openings = [f1.faces().sort_by_distance(p)[0] for p in [
        (1.729097, -11.819507, 0),
    ]]
    offset(amount=F3_T, openings=f3_openings, kind=Kind.INTERSECTION)


solid = f1.part
